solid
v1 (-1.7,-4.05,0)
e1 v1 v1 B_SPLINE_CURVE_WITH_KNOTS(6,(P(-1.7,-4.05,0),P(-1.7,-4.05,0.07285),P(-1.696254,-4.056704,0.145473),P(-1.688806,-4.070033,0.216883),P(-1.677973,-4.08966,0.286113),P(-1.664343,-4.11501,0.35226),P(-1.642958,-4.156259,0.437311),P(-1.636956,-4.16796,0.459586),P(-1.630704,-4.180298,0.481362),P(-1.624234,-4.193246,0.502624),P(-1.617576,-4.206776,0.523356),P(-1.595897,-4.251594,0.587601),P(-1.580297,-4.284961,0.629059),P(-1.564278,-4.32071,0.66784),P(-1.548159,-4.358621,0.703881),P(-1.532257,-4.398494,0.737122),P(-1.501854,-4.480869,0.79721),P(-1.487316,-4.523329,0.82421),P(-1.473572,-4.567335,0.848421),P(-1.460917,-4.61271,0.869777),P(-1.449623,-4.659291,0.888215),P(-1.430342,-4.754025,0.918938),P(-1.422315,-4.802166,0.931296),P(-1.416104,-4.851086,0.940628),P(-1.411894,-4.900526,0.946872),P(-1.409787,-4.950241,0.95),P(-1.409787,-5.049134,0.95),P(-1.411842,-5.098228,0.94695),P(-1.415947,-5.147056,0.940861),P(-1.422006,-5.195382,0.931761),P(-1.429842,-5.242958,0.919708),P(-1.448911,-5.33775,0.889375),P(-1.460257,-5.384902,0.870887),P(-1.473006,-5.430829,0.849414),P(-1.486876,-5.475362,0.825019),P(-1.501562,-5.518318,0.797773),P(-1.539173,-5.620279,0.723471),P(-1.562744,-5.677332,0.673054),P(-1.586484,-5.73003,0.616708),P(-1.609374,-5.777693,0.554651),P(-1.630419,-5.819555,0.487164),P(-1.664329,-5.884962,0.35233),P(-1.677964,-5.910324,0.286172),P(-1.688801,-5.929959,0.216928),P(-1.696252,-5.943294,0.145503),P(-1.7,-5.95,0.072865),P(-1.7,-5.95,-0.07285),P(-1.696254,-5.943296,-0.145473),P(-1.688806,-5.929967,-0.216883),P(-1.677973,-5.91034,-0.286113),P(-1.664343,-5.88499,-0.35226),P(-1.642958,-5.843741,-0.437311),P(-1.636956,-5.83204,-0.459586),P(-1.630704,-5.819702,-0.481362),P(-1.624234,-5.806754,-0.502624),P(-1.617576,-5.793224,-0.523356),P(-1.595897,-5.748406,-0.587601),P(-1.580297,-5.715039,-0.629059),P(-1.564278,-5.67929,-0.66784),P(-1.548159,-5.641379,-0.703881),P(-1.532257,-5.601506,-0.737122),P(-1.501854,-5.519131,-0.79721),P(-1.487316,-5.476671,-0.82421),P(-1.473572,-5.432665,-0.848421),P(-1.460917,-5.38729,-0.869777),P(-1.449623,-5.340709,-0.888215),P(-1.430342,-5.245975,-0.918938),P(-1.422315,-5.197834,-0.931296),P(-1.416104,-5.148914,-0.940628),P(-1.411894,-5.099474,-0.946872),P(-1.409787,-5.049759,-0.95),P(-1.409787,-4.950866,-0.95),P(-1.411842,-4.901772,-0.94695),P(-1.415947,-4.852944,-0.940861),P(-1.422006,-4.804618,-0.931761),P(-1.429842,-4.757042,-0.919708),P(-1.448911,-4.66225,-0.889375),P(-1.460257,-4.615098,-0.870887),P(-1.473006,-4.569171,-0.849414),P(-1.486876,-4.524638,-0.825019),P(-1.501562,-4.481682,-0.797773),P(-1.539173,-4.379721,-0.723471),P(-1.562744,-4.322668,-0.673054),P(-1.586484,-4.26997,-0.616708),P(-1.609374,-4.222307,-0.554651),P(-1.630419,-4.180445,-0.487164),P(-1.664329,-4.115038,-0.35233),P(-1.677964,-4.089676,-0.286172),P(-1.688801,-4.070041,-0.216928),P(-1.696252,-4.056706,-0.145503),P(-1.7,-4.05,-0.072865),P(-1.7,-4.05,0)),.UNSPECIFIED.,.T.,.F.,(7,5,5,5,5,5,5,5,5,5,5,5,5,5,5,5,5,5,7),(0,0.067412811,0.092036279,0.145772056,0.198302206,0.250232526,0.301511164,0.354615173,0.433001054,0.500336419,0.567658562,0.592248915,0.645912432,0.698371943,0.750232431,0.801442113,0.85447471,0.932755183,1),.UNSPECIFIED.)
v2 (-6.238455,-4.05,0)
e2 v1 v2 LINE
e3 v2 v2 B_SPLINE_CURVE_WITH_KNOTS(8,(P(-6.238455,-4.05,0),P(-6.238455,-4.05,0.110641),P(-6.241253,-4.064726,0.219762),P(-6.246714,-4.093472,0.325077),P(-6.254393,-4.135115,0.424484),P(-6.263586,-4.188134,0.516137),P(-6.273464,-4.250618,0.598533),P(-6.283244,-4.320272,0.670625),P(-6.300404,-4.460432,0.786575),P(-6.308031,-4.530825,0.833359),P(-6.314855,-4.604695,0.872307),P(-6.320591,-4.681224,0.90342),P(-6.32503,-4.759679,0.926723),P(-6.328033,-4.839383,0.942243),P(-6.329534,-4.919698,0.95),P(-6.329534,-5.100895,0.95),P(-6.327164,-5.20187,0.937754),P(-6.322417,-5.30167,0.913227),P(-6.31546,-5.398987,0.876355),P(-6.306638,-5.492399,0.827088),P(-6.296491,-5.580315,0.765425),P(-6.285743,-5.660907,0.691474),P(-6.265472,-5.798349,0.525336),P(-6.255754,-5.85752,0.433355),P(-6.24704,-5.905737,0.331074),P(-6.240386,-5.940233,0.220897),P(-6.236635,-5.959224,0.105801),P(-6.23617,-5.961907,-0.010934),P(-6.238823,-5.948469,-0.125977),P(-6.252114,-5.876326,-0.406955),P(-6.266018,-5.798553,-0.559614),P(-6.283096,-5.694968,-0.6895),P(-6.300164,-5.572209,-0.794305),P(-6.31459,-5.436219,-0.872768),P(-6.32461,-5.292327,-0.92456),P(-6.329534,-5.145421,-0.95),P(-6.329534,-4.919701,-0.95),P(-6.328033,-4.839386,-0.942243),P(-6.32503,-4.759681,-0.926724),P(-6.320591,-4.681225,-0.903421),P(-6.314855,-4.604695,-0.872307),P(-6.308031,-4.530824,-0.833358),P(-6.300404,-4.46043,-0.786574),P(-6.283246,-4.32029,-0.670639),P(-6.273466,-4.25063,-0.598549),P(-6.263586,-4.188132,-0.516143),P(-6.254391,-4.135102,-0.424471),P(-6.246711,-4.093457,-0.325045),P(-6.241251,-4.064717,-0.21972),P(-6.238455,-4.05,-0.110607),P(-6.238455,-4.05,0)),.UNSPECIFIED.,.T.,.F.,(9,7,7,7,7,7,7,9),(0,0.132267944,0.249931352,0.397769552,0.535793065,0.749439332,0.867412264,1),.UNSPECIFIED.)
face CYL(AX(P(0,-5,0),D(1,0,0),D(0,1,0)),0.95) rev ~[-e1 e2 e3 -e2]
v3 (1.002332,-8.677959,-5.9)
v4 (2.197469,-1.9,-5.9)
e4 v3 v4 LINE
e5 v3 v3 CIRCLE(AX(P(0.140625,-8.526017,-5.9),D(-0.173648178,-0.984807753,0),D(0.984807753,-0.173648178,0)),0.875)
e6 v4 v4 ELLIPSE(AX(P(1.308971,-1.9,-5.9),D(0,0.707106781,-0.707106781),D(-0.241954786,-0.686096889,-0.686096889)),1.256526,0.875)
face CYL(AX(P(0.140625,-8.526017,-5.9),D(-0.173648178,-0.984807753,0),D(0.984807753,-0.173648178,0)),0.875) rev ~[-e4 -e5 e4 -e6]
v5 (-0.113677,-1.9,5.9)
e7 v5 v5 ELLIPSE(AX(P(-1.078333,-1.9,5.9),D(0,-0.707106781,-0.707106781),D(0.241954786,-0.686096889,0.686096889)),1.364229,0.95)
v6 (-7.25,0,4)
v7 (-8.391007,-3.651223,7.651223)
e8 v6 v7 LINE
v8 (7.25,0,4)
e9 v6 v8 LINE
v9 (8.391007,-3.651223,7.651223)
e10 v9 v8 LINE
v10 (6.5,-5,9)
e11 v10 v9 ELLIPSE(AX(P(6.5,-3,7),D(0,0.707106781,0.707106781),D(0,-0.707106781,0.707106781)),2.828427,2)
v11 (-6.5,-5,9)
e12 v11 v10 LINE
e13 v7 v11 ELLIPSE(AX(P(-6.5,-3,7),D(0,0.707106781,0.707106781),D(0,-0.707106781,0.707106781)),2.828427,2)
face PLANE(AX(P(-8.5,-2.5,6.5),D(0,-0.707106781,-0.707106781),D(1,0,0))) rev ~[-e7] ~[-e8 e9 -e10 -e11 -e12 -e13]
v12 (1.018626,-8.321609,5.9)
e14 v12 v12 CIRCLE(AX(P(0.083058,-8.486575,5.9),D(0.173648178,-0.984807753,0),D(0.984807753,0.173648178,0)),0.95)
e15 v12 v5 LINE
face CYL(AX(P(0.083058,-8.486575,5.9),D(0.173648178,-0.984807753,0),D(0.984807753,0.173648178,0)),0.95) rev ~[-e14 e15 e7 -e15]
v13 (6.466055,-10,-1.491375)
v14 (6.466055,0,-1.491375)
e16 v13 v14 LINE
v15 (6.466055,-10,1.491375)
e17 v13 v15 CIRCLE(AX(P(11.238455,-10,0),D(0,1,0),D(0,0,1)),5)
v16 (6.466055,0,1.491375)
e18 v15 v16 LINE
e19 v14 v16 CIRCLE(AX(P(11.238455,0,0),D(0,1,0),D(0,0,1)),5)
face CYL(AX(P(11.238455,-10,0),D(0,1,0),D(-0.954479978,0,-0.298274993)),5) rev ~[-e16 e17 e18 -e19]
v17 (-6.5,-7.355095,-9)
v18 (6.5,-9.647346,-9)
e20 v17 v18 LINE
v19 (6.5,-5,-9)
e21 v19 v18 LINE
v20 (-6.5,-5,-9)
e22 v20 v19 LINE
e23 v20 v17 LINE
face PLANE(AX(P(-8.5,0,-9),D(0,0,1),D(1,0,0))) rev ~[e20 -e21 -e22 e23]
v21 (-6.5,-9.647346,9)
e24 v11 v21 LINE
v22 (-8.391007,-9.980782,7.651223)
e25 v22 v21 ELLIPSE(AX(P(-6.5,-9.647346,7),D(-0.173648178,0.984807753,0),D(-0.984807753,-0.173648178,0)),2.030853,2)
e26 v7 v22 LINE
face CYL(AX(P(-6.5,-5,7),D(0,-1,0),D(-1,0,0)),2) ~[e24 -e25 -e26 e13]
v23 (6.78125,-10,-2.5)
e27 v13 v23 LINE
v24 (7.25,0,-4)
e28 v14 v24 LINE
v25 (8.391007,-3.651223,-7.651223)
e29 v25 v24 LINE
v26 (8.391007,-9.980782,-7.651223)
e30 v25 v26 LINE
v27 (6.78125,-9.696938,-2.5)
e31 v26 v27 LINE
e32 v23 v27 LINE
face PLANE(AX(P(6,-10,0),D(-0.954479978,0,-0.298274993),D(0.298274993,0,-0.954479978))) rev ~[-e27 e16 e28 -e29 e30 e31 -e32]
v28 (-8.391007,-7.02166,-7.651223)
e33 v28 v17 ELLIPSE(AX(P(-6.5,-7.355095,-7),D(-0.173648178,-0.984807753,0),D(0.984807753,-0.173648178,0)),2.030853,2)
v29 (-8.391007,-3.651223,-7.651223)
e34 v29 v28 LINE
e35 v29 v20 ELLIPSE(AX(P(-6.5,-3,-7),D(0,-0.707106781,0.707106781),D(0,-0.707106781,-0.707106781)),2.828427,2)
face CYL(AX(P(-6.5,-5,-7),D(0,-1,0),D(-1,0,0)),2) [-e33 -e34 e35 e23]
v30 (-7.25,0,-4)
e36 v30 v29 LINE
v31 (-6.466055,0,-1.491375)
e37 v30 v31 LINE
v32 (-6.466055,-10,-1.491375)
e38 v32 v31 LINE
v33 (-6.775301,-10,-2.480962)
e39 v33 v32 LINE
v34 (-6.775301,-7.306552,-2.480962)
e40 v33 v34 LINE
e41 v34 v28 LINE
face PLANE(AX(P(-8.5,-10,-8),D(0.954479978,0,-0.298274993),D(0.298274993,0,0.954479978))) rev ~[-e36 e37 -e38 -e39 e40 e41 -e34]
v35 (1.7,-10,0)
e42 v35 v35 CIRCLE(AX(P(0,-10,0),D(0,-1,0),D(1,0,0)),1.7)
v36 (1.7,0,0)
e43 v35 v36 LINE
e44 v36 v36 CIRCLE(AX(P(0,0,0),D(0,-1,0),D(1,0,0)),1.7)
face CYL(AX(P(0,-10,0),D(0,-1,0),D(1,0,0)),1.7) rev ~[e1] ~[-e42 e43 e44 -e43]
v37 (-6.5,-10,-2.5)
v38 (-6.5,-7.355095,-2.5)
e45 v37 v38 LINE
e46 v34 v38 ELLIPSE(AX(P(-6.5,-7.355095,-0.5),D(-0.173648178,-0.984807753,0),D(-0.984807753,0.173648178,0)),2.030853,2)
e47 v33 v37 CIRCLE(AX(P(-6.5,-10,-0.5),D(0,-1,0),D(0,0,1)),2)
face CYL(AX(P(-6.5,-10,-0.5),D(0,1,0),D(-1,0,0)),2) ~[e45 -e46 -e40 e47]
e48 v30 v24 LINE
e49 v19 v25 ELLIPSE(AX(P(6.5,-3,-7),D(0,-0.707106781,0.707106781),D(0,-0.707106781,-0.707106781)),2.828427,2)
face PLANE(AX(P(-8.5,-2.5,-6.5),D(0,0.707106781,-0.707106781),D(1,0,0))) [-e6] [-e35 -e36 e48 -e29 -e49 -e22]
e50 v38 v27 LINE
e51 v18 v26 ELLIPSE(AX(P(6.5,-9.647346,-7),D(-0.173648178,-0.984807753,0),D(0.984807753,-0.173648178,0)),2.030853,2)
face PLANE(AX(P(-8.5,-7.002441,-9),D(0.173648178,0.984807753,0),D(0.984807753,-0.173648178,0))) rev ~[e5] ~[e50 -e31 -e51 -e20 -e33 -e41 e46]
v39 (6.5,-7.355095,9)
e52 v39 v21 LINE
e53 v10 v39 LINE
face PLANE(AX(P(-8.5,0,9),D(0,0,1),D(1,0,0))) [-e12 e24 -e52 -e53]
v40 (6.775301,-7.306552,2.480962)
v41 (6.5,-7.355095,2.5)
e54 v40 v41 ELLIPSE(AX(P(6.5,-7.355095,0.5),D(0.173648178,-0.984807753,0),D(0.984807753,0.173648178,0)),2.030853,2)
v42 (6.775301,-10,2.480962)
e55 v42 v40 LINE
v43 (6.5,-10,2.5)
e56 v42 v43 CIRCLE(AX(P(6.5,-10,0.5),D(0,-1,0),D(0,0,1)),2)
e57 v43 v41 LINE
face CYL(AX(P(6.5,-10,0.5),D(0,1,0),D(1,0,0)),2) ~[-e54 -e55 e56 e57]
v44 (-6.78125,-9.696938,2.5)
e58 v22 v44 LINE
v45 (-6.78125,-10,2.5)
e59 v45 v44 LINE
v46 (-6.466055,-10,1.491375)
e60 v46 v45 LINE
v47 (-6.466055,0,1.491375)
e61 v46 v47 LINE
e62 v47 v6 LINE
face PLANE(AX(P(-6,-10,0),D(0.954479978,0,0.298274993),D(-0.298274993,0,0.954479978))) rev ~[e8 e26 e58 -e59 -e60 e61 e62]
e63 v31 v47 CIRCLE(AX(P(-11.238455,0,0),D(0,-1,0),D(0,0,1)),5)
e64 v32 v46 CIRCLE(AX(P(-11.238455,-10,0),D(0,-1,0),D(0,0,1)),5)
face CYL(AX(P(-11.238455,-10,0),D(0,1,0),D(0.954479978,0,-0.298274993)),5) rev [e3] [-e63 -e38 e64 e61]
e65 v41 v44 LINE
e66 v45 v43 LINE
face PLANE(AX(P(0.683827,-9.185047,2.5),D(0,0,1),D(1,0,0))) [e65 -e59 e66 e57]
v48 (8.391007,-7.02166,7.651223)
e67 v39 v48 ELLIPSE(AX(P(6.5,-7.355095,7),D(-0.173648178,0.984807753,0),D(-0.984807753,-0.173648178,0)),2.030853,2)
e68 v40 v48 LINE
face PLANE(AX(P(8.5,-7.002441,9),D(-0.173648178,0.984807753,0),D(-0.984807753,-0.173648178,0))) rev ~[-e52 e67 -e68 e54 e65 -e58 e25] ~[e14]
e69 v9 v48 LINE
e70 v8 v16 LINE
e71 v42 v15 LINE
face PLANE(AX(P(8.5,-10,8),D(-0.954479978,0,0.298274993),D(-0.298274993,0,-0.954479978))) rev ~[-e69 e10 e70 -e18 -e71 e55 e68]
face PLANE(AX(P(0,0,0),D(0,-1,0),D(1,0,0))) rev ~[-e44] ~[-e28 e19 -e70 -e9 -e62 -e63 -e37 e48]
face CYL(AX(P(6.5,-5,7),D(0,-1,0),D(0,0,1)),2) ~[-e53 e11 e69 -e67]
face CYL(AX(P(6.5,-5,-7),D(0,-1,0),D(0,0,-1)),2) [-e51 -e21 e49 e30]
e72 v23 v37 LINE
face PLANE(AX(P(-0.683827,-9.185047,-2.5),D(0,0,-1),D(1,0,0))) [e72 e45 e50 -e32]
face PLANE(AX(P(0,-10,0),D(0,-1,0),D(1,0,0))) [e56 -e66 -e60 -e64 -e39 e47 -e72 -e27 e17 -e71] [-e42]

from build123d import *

# Parameters (mm, degrees)
F0_W      = 17
F0_H      = 18
F1_DEPTH  = 10
F2_R      = 1.7
F3_DEPTH  = 25
F5_DEPTH  = 6.5
F7_DEPTH  = 6.5
F8_SIZE   = 5
F9_R      = 2
F11_DEPTH = 25
F12_R     = 5
F13_R     = 0.95
F14_DEPTH = 25
F15_R     = 0.875
F16_DEPTH = 25
F17_R     = 0.95
F18_DEPTH = 25


# Not quite as in the source:
# - a feature names something its author has since deleted; it is built from what else it names


with BuildPart() as f1:
    # F0 (on Front) → F1 (new body)
    with BuildSketch(Plane.XZ):
        Rectangle(F0_W, F0_H)
    extrude(amount=F1_DEPTH)

    # F2 (on face) → F3 (cut)
    with BuildSketch(Plane.XZ.offset(10)):
        Circle(F2_R)
    extrude(amount=-F3_DEPTH, mode=Mode.SUBTRACT)

    # F4 (on face) → F5 (cut)
    with BuildSketch(Plane(origin=(0, 0, -9), x_dir=(1, 0, 0), z_dir=(0, 0, -1))):
        Polygon((8.5, 10), (-8.5, 10), (-8.5, 7.002441328), align=None)
    extrude(amount=-F5_DEPTH, mode=Mode.SUBTRACT)

    # F6 (on face) → F7 (cut)
    with BuildSketch(Plane.XY.offset(9)):
        Polygon((8.5, -7.002441328), (-8.5, -10), (8.5, -10), align=None)
    extrude(amount=-F7_DEPTH, mode=Mode.SUBTRACT)

    # F8
    f8_edges = [f1.edges().sort_by_distance(p)[0] for p in [
        (0, 0, 9),
        (0, 0, -9),
    ]]
    chamfer(f8_edges, length=F8_SIZE)

    # F9
    f9_edges = [f1.edges().sort_by_distance(p)[0] for p in [
        (8.5, -8.501221, 2.5),
        (-8.5, -8.501221, -2.5),
        (8.5, -7.5, -9),
        (-8.5, -6.001221, -9),
        (8.5, -6.001221, 9),
        (-8.5, -7.5, 9),
    ]]
    fillet(f9_edges, radius=F9_R)

    # F10 (on face) → F11 (cut)
    with BuildSketch(Plane.XZ.offset(10)):
        Polygon((-8.5, -8), (-6, 0), (-8.5, 8), align=None)
        Polygon((8.5, -8), (8.5, 8), (6, 0), align=None)
    extrude(amount=-F11_DEPTH, mode=Mode.SUBTRACT)

    # F12
    f12_edges = [f1.edges().sort_by_distance(p)[0] for p in [
        (-6, -5, 0),
        (6, -5, 0),
    ]]
    fillet(f12_edges, radius=F12_R)

    # F13 (on face) → F14 (cut)
    with BuildSketch(Plane(origin=(1.453794355, -8.2448774948, 0), x_dir=(0.984807753, 0.1736481777, 0), z_dir=(0.1736481777, -0.984807753, 0))):
        with Locations((-1.3918819604, 5.9)):
            Circle(F13_R)
    extrude(amount=-F14_DEPTH, mode=Mode.SUBTRACT)

    # F15 (on face) → F16 (cut)
    with BuildSketch(Plane(origin=(-1.453794355, -8.2448774948, 0), x_dir=(0.984807753, -0.1736481777, 0), z_dir=(-0.1736481777, -0.984807753, 0))):
        with Locations((1.6190158435, -5.9)):
            Circle(F15_R)
    extrude(amount=-F16_DEPTH, mode=Mode.SUBTRACT)

    # F17 (on Right) → F18 (cut)
    with BuildSketch(Plane.YZ):
        with Locations((-5, 0)):
            Circle(F17_R)
    extrude(amount=-F18_DEPTH, mode=Mode.SUBTRACT)


solid = f1.part
